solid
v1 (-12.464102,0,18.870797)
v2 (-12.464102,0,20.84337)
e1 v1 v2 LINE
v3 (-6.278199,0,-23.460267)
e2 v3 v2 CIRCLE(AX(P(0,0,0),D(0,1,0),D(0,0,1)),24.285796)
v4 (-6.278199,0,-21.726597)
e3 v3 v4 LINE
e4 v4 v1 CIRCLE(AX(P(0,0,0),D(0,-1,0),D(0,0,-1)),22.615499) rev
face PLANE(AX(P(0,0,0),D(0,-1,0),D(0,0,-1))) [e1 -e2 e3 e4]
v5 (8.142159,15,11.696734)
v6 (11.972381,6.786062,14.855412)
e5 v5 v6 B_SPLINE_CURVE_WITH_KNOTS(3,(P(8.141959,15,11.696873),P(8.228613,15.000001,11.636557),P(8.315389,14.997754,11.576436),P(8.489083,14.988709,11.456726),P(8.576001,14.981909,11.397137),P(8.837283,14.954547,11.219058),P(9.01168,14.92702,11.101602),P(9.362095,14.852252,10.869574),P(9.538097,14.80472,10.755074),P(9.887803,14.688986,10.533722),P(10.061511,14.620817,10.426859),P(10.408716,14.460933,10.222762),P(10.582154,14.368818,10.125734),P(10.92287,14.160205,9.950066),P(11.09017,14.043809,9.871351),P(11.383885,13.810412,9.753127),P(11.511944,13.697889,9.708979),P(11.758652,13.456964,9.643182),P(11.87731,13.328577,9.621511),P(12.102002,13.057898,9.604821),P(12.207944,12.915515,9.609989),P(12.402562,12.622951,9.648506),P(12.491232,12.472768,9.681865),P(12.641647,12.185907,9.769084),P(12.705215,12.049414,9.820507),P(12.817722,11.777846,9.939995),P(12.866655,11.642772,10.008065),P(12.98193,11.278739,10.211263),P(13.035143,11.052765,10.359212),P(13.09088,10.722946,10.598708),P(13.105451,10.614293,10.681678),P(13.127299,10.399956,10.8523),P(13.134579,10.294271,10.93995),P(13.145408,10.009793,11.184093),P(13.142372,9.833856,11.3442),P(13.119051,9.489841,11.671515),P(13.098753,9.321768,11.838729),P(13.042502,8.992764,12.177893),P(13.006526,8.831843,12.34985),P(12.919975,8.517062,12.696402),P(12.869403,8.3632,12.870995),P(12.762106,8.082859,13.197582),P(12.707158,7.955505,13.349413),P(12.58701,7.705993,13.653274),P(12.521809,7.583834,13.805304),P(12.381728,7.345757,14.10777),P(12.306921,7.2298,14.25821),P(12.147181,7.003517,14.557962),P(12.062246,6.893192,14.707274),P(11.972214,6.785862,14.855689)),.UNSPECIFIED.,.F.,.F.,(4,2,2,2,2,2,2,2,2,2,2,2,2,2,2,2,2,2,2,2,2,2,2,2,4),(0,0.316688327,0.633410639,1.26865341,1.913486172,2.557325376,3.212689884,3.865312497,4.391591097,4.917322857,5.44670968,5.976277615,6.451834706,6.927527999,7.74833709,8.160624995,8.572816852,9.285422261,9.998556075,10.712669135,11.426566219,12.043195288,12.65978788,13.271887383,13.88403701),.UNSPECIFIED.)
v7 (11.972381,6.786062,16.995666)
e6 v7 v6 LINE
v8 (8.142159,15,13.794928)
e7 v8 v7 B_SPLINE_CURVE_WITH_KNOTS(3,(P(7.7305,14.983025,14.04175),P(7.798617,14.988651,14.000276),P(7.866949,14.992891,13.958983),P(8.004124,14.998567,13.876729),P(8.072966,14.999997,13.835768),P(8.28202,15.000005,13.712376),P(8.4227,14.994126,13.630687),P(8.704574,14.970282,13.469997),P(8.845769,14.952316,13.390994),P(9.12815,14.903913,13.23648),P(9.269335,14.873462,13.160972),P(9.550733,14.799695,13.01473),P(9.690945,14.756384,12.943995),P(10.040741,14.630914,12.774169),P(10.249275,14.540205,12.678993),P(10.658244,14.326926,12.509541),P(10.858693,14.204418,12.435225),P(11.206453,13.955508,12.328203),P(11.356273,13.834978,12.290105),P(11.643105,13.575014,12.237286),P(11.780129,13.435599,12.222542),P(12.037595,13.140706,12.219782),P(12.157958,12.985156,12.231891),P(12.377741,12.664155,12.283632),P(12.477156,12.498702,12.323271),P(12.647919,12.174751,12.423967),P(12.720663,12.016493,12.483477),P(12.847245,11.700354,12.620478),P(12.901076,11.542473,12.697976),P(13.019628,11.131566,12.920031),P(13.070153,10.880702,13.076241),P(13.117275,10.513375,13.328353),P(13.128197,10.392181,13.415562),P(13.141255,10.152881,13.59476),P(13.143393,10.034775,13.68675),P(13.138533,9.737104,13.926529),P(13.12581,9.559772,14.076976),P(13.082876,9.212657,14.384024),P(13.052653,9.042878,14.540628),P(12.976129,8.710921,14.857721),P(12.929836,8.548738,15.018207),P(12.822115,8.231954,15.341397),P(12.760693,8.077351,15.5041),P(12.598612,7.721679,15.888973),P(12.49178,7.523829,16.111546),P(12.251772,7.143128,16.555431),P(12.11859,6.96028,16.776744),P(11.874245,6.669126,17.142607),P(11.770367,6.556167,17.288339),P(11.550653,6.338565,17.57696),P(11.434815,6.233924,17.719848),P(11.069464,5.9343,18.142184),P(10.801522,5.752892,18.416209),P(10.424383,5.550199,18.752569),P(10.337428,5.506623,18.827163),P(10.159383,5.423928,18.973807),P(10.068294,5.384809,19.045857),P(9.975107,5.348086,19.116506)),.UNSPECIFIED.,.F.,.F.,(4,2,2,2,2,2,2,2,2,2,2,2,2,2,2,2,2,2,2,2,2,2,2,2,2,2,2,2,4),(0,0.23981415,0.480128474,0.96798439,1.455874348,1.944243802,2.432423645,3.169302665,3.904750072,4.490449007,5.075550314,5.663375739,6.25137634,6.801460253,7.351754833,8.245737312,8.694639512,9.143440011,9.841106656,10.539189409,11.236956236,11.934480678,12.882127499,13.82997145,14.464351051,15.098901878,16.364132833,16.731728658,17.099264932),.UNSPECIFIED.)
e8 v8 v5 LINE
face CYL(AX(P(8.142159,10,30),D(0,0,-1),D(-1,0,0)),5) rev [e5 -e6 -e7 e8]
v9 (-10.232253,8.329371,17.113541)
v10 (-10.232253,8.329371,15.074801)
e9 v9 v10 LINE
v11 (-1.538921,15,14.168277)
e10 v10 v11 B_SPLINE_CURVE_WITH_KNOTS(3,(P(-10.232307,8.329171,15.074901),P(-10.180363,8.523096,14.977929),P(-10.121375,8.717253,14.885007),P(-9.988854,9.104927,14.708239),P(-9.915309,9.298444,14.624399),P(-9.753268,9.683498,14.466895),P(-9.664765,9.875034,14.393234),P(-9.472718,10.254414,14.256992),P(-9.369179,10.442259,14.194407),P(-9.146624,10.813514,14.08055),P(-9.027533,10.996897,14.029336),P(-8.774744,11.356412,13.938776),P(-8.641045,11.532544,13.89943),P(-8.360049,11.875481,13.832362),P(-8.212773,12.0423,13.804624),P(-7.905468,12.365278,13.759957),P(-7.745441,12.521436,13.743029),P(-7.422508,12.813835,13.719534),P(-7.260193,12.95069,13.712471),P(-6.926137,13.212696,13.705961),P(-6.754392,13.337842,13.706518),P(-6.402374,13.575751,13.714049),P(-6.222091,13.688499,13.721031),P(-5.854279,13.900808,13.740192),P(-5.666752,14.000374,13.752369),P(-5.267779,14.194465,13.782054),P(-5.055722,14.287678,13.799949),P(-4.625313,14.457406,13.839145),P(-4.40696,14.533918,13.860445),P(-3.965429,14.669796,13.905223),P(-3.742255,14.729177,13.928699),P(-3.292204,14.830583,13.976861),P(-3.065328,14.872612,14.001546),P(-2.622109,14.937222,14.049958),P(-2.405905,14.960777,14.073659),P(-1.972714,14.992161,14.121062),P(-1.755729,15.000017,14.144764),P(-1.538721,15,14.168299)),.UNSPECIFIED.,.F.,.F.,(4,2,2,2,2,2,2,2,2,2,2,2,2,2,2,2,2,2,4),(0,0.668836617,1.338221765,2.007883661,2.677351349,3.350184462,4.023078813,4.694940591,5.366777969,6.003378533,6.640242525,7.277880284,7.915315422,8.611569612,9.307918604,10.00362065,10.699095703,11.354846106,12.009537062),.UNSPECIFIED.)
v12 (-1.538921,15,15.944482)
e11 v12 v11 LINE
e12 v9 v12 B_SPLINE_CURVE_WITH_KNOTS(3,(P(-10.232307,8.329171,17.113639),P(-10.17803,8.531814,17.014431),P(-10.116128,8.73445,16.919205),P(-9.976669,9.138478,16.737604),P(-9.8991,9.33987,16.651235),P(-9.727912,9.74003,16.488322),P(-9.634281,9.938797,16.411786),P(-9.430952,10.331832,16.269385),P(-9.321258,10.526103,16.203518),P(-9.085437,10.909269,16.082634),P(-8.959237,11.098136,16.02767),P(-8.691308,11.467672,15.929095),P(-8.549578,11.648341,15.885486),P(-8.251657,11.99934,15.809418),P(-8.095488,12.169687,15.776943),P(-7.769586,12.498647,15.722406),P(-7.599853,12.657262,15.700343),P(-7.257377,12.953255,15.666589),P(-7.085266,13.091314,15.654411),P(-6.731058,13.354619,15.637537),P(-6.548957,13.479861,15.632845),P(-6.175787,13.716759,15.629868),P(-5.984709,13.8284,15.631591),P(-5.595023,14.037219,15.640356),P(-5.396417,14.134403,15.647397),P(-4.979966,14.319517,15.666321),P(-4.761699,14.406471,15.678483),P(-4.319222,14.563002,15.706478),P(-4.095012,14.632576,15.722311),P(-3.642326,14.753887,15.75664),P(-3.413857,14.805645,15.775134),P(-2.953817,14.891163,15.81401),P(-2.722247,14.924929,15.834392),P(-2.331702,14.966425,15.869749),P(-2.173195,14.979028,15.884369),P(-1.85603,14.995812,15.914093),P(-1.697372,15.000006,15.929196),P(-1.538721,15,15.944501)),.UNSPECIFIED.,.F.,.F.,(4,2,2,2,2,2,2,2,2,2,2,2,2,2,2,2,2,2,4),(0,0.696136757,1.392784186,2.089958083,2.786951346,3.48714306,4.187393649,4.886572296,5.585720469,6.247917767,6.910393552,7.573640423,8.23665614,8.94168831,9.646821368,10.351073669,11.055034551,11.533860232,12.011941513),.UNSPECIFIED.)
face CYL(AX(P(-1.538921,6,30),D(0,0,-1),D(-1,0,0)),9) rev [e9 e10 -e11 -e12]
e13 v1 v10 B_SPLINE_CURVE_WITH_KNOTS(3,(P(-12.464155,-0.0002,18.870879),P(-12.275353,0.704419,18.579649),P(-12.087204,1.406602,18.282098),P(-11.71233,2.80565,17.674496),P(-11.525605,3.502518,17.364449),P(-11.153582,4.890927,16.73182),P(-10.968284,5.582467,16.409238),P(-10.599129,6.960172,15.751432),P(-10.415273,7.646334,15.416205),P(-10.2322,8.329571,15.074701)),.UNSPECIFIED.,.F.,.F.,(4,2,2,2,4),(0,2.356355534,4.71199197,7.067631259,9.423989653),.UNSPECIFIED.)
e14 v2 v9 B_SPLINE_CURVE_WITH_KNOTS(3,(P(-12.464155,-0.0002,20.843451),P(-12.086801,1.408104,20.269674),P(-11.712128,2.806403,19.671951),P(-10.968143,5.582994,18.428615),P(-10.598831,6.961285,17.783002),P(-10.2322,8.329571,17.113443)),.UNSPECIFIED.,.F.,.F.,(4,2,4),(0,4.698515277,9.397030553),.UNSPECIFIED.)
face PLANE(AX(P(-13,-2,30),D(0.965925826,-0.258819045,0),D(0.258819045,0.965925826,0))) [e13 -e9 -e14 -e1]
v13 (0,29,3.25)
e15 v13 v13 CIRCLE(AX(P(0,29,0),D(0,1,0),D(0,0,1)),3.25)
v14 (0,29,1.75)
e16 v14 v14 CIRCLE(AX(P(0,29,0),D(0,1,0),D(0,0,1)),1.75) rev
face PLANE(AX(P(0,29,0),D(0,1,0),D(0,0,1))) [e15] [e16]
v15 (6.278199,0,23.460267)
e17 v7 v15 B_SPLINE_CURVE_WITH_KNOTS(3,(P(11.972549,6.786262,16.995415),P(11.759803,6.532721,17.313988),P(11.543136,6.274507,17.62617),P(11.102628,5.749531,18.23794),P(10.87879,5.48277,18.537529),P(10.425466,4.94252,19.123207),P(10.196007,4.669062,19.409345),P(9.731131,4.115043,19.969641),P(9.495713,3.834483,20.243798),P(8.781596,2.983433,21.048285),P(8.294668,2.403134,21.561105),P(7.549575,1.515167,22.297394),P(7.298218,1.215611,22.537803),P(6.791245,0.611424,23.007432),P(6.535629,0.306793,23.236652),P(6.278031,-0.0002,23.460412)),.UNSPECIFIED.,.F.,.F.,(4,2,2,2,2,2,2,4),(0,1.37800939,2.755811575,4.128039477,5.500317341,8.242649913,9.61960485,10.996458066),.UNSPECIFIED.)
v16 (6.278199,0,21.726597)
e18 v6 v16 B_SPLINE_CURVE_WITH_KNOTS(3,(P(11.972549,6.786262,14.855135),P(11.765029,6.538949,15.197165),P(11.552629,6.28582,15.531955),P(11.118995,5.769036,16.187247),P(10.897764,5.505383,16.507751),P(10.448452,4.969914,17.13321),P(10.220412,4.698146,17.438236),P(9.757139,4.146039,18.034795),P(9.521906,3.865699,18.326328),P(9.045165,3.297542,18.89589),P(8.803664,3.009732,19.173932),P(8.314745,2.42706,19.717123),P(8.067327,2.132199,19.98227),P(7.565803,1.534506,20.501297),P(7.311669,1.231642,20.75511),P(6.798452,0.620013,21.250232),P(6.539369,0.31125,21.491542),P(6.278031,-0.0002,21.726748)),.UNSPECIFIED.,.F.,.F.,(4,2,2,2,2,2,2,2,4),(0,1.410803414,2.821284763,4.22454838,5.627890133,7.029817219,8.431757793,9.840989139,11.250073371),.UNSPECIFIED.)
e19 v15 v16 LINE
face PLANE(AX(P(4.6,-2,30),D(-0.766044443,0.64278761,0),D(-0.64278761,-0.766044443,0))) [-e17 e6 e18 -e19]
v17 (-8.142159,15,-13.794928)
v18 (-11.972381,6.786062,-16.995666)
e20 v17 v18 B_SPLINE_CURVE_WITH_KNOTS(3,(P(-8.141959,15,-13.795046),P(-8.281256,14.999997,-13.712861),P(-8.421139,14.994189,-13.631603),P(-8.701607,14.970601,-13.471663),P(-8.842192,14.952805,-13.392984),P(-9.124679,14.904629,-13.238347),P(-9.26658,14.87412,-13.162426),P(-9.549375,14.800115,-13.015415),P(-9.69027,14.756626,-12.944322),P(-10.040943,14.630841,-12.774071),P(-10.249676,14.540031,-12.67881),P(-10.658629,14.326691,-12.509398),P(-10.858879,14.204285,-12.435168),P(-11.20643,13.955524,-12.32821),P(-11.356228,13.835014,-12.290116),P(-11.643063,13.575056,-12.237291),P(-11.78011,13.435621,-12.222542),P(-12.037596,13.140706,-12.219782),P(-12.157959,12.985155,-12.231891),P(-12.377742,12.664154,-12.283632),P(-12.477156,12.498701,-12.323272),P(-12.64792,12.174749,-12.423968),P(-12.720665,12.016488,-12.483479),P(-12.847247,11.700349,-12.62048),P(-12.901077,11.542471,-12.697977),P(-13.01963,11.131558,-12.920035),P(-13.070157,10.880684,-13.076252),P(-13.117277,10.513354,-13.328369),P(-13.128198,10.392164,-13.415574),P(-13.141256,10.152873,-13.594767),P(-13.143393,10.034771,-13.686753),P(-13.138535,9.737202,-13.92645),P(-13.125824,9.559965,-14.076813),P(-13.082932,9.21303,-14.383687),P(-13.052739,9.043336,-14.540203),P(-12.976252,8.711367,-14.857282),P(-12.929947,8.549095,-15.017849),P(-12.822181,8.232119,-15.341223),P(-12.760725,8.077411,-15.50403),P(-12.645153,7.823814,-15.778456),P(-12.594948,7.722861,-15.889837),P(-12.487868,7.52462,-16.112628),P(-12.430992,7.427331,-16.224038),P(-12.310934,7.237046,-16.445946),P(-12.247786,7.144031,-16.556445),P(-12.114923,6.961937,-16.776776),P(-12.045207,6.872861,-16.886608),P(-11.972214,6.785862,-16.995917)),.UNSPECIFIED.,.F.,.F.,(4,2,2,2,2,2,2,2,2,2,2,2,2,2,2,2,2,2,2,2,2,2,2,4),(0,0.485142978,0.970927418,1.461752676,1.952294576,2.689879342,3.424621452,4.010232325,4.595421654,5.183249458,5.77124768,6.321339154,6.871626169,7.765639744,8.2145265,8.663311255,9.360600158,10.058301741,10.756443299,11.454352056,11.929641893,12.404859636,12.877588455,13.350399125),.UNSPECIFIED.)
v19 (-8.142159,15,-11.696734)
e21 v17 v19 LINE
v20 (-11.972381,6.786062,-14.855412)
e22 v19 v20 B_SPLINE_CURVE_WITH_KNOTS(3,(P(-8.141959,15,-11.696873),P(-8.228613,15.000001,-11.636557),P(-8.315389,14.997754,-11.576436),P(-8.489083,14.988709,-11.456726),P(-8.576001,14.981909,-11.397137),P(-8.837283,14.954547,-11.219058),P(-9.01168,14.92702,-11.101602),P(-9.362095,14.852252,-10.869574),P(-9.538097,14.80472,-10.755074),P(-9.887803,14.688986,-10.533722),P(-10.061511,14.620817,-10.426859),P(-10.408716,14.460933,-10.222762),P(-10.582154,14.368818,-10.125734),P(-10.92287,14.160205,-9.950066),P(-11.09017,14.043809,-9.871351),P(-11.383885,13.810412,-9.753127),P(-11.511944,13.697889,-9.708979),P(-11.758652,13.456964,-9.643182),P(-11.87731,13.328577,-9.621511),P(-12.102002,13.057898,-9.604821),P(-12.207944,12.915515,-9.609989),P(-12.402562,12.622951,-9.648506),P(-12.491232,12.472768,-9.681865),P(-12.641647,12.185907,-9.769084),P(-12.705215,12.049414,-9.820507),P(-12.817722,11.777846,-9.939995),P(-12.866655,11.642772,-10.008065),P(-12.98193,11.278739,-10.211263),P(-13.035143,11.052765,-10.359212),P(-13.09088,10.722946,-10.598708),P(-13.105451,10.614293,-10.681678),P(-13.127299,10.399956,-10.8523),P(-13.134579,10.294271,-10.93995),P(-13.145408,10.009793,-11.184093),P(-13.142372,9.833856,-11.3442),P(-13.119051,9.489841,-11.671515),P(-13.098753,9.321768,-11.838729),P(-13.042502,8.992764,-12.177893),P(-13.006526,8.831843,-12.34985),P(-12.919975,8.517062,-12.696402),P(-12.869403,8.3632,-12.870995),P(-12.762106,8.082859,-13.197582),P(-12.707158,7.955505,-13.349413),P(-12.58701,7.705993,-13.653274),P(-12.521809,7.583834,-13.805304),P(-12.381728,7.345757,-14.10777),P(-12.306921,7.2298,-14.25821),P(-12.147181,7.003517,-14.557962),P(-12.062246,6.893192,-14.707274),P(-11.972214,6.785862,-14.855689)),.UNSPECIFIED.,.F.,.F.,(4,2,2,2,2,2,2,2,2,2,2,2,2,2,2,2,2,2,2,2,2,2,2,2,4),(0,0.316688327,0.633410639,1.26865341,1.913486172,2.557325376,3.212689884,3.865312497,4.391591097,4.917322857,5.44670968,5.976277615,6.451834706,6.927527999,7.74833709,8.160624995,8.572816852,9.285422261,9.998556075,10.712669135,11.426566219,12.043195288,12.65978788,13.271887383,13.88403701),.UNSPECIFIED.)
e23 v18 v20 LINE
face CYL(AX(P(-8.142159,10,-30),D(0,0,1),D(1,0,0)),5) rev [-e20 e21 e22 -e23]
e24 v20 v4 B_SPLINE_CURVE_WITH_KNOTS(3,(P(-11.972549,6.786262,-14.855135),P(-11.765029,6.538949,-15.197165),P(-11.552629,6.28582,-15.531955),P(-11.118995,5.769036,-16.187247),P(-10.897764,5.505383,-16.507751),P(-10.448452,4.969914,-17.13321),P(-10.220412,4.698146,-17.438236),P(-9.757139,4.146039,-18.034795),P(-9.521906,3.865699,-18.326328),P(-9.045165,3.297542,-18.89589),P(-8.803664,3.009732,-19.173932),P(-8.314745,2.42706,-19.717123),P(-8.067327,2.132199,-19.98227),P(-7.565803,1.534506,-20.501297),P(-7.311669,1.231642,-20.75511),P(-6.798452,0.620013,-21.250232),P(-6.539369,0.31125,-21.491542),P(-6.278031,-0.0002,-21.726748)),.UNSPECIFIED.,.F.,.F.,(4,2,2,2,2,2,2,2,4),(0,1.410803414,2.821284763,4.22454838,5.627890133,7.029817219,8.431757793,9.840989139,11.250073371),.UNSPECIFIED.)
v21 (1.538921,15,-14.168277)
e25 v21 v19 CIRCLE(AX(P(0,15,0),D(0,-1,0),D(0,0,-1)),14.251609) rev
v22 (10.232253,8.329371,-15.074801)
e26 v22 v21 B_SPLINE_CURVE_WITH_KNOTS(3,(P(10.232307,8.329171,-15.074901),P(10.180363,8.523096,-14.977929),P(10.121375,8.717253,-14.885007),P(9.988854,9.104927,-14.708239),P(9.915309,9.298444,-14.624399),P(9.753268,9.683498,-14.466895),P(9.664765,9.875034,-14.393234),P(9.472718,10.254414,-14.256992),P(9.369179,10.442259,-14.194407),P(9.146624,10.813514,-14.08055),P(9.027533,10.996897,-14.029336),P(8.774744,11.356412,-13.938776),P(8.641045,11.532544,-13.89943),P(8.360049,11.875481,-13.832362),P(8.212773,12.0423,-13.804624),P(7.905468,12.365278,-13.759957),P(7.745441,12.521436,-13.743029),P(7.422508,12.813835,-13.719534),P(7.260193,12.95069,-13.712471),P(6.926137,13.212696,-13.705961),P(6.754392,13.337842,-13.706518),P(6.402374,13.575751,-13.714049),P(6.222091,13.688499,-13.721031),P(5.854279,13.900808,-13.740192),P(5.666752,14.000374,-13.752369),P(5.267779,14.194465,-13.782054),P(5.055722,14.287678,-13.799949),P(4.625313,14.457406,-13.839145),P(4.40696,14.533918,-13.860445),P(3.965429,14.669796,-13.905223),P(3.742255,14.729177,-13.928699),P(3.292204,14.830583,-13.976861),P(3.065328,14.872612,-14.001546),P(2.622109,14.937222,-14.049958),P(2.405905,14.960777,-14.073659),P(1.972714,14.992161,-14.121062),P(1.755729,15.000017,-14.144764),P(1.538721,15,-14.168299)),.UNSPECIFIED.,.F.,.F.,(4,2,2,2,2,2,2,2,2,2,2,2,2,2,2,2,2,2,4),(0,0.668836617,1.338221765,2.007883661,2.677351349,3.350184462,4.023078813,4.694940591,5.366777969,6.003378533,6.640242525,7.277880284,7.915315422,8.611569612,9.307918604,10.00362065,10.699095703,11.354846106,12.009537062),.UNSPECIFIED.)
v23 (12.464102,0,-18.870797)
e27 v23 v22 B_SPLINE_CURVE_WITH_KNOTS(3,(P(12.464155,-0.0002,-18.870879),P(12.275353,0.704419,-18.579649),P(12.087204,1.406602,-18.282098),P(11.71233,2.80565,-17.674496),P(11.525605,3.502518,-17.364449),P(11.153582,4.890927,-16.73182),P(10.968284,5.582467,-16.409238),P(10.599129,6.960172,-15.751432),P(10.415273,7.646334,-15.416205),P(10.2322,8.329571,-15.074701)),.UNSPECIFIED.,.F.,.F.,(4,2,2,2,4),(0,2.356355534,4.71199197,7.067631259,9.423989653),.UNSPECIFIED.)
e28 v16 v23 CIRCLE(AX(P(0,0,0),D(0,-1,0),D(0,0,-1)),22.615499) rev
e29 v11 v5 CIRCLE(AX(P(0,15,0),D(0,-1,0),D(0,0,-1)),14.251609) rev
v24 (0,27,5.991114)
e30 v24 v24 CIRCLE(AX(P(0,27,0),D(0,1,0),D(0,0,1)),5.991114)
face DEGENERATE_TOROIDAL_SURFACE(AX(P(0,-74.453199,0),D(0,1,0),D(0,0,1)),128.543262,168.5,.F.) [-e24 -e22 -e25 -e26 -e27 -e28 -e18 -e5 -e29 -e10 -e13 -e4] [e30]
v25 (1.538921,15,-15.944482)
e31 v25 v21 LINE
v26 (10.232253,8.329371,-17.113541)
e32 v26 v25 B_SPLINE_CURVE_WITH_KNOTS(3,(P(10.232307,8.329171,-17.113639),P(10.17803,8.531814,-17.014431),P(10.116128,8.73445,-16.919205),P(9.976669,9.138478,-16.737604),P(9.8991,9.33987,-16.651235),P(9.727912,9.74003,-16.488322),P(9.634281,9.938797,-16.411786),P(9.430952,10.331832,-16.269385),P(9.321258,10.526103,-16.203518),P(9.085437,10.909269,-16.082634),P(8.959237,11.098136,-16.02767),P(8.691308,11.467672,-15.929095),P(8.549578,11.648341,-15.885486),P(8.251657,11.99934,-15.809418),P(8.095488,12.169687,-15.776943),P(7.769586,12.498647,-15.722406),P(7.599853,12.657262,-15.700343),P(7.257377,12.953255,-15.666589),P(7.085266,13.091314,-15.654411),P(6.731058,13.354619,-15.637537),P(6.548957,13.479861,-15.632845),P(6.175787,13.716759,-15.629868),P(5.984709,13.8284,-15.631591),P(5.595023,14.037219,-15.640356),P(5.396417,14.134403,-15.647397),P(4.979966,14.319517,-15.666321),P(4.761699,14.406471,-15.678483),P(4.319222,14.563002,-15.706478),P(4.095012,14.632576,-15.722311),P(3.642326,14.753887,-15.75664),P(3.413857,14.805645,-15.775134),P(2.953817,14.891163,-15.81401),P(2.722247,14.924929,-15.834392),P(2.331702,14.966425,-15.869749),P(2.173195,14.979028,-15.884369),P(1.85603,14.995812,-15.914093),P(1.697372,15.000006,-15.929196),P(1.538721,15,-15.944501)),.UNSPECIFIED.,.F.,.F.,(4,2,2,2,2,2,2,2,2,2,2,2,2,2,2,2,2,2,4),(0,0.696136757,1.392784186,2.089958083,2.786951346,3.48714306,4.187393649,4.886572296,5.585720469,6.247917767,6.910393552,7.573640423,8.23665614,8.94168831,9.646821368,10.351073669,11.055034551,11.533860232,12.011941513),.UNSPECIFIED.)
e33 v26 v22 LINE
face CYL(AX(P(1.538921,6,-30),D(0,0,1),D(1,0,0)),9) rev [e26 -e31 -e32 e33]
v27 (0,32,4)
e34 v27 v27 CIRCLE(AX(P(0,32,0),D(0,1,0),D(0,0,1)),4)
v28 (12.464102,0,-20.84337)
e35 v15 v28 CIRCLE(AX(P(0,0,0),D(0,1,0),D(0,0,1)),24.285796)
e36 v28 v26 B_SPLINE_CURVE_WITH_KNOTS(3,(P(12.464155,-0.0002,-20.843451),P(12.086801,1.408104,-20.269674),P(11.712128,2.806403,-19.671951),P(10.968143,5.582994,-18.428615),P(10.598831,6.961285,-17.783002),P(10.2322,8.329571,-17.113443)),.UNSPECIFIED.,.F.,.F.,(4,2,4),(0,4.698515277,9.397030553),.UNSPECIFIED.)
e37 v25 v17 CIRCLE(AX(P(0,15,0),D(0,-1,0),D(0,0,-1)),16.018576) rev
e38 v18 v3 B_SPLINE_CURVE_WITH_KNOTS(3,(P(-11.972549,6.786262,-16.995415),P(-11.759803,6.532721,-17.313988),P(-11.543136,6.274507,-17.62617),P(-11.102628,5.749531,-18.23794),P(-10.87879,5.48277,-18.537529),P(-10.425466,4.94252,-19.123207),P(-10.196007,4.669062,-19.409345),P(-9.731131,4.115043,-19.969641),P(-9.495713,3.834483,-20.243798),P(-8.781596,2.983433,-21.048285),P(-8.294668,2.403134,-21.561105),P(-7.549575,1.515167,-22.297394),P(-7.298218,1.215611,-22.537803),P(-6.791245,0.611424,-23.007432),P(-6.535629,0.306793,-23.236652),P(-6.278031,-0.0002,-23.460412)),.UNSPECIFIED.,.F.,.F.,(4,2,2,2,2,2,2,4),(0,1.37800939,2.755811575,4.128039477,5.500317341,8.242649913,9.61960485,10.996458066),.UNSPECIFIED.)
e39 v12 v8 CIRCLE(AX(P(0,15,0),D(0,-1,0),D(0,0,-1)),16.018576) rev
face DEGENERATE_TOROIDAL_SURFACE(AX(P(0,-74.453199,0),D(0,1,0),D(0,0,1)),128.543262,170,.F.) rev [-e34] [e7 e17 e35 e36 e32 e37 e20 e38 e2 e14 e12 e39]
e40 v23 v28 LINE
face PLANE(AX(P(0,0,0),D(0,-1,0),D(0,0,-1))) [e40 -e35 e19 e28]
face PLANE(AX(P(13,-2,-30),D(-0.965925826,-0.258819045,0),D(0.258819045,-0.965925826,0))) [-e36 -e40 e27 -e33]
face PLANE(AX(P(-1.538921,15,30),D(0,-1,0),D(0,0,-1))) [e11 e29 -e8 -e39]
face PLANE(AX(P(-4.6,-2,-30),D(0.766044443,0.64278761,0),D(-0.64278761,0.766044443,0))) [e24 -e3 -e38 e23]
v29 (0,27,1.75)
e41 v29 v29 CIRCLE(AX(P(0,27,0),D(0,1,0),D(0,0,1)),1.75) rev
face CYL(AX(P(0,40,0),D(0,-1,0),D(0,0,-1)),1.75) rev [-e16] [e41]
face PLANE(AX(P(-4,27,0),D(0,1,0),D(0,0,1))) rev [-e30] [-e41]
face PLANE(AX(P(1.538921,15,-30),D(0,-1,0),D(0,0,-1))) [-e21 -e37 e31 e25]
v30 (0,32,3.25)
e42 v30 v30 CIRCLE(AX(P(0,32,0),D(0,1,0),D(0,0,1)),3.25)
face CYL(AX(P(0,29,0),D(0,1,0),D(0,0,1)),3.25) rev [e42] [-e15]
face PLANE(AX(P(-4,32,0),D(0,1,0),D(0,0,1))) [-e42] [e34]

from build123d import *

# Parameters (mm, degrees)
SKETCH_7_R               = 3.25
CUT_EXTRUDE_1_DEPTH      = 3
SKETCH_8_R               = 1.75
CUT_EXTRUDE_2_DEPTH      = 40
CUT_EXTRUDE_3_DEPTH      = 30
PATTERN_CIRCULAR_1_COUNT = 2


# Read off the part's stored shape, not the designer's step: 쉘1
with BuildPart() as part:
    # 스케치1 → 회전1 (revolve)
    with BuildSketch(Plane.XY, mode=Mode.PRIVATE) as revolve_1_sk:
        with BuildLine():
            Line((0, 32), (0, 0))
            Line((0, 0), (-24.285796176, 0))
            ThreePointArc((-24.285796176, 0), (-15.037169396, 16.566906421), (-4, 32))
            Line((-4, 32), (0, 32))
        make_face()
    revolve(revolve_1_sk.sketch.rotate(Axis((0, 108.7652361, 0), (0, -1, 0)), 270), axis=Axis((0, 108.7652361, 0), (0, -1, 0)))

    # 쉘1 outline → 쉘1 (revolve, cut)
    with BuildSketch(Plane.XY):
        with BuildLine():
            ThreePointArc((22.615498991, 0), (14.939810561, 13.89190703), (5.991113868, 27))
            Line((5.991113868, 27), (0, 27))
            Line((0, 27), (0, 0))
            Line((0, 0), (22.615498991, 0))
        make_face()
    revolve(axis=Axis((0, 0, 0), (0, 1, 0)), mode=Mode.SUBTRACT)

    # 스케치7 → 돌출1 (cut)
    with BuildSketch(Plane(origin=(0, 32, 0), x_dir=(1, 0, 0), z_dir=(0, 1, 0))):
        with Locations(Location((0, 0, 0), (0, 0, 270))):
            Circle(SKETCH_7_R)
    extrude(amount=-CUT_EXTRUDE_1_DEPTH, mode=Mode.SUBTRACT)

    # 스케치8 → 돌출2 (cut)
    with BuildSketch(Plane(origin=(0, 0, 0), x_dir=(1, 0, 0), z_dir=(0, 1, 0))):
        with Locations(Location((0, 0, 0), (0, 0, 270))):
            Circle(SKETCH_8_R)
    extrude(amount=CUT_EXTRUDE_2_DEPTH, mode=Mode.SUBTRACT)

    # 스케치9 → 돌출3 (cut)
    with BuildSketch(Plane.XY):
        with BuildLine():
            Line((-13, -2), (4.6, -2))
            Line((4.6, -2), (11.972381343, 6.786061952))
            ThreePointArc((11.972381343, 6.786061952), (12.673698063, 12.113091309), (8.142159127, 15))
            Line((8.142159127, 15), (-1.538920837, 15))
            ThreePointArc((-1.538920837, 15), (-7.017773698, 13.140180063), (-10.232253273, 8.329371406))
            Line((-10.232253273, 8.329371406), (-13, -2))
        make_face()
    cut_extrude_3 = extrude(amount=CUT_EXTRUDE_3_DEPTH, mode=Mode.SUBTRACT)

    # 원형 패턴1: 돌출3 ×2 about axis
    pattern_circular_1_axis = Axis((0, 40, 0), (0, -1, 0))
    for i in range(1, PATTERN_CIRCULAR_1_COUNT):
        add(cut_extrude_3.rotate(pattern_circular_1_axis, i * 360 / PATTERN_CIRCULAR_1_COUNT), mode=Mode.SUBTRACT)


solid = part.part
